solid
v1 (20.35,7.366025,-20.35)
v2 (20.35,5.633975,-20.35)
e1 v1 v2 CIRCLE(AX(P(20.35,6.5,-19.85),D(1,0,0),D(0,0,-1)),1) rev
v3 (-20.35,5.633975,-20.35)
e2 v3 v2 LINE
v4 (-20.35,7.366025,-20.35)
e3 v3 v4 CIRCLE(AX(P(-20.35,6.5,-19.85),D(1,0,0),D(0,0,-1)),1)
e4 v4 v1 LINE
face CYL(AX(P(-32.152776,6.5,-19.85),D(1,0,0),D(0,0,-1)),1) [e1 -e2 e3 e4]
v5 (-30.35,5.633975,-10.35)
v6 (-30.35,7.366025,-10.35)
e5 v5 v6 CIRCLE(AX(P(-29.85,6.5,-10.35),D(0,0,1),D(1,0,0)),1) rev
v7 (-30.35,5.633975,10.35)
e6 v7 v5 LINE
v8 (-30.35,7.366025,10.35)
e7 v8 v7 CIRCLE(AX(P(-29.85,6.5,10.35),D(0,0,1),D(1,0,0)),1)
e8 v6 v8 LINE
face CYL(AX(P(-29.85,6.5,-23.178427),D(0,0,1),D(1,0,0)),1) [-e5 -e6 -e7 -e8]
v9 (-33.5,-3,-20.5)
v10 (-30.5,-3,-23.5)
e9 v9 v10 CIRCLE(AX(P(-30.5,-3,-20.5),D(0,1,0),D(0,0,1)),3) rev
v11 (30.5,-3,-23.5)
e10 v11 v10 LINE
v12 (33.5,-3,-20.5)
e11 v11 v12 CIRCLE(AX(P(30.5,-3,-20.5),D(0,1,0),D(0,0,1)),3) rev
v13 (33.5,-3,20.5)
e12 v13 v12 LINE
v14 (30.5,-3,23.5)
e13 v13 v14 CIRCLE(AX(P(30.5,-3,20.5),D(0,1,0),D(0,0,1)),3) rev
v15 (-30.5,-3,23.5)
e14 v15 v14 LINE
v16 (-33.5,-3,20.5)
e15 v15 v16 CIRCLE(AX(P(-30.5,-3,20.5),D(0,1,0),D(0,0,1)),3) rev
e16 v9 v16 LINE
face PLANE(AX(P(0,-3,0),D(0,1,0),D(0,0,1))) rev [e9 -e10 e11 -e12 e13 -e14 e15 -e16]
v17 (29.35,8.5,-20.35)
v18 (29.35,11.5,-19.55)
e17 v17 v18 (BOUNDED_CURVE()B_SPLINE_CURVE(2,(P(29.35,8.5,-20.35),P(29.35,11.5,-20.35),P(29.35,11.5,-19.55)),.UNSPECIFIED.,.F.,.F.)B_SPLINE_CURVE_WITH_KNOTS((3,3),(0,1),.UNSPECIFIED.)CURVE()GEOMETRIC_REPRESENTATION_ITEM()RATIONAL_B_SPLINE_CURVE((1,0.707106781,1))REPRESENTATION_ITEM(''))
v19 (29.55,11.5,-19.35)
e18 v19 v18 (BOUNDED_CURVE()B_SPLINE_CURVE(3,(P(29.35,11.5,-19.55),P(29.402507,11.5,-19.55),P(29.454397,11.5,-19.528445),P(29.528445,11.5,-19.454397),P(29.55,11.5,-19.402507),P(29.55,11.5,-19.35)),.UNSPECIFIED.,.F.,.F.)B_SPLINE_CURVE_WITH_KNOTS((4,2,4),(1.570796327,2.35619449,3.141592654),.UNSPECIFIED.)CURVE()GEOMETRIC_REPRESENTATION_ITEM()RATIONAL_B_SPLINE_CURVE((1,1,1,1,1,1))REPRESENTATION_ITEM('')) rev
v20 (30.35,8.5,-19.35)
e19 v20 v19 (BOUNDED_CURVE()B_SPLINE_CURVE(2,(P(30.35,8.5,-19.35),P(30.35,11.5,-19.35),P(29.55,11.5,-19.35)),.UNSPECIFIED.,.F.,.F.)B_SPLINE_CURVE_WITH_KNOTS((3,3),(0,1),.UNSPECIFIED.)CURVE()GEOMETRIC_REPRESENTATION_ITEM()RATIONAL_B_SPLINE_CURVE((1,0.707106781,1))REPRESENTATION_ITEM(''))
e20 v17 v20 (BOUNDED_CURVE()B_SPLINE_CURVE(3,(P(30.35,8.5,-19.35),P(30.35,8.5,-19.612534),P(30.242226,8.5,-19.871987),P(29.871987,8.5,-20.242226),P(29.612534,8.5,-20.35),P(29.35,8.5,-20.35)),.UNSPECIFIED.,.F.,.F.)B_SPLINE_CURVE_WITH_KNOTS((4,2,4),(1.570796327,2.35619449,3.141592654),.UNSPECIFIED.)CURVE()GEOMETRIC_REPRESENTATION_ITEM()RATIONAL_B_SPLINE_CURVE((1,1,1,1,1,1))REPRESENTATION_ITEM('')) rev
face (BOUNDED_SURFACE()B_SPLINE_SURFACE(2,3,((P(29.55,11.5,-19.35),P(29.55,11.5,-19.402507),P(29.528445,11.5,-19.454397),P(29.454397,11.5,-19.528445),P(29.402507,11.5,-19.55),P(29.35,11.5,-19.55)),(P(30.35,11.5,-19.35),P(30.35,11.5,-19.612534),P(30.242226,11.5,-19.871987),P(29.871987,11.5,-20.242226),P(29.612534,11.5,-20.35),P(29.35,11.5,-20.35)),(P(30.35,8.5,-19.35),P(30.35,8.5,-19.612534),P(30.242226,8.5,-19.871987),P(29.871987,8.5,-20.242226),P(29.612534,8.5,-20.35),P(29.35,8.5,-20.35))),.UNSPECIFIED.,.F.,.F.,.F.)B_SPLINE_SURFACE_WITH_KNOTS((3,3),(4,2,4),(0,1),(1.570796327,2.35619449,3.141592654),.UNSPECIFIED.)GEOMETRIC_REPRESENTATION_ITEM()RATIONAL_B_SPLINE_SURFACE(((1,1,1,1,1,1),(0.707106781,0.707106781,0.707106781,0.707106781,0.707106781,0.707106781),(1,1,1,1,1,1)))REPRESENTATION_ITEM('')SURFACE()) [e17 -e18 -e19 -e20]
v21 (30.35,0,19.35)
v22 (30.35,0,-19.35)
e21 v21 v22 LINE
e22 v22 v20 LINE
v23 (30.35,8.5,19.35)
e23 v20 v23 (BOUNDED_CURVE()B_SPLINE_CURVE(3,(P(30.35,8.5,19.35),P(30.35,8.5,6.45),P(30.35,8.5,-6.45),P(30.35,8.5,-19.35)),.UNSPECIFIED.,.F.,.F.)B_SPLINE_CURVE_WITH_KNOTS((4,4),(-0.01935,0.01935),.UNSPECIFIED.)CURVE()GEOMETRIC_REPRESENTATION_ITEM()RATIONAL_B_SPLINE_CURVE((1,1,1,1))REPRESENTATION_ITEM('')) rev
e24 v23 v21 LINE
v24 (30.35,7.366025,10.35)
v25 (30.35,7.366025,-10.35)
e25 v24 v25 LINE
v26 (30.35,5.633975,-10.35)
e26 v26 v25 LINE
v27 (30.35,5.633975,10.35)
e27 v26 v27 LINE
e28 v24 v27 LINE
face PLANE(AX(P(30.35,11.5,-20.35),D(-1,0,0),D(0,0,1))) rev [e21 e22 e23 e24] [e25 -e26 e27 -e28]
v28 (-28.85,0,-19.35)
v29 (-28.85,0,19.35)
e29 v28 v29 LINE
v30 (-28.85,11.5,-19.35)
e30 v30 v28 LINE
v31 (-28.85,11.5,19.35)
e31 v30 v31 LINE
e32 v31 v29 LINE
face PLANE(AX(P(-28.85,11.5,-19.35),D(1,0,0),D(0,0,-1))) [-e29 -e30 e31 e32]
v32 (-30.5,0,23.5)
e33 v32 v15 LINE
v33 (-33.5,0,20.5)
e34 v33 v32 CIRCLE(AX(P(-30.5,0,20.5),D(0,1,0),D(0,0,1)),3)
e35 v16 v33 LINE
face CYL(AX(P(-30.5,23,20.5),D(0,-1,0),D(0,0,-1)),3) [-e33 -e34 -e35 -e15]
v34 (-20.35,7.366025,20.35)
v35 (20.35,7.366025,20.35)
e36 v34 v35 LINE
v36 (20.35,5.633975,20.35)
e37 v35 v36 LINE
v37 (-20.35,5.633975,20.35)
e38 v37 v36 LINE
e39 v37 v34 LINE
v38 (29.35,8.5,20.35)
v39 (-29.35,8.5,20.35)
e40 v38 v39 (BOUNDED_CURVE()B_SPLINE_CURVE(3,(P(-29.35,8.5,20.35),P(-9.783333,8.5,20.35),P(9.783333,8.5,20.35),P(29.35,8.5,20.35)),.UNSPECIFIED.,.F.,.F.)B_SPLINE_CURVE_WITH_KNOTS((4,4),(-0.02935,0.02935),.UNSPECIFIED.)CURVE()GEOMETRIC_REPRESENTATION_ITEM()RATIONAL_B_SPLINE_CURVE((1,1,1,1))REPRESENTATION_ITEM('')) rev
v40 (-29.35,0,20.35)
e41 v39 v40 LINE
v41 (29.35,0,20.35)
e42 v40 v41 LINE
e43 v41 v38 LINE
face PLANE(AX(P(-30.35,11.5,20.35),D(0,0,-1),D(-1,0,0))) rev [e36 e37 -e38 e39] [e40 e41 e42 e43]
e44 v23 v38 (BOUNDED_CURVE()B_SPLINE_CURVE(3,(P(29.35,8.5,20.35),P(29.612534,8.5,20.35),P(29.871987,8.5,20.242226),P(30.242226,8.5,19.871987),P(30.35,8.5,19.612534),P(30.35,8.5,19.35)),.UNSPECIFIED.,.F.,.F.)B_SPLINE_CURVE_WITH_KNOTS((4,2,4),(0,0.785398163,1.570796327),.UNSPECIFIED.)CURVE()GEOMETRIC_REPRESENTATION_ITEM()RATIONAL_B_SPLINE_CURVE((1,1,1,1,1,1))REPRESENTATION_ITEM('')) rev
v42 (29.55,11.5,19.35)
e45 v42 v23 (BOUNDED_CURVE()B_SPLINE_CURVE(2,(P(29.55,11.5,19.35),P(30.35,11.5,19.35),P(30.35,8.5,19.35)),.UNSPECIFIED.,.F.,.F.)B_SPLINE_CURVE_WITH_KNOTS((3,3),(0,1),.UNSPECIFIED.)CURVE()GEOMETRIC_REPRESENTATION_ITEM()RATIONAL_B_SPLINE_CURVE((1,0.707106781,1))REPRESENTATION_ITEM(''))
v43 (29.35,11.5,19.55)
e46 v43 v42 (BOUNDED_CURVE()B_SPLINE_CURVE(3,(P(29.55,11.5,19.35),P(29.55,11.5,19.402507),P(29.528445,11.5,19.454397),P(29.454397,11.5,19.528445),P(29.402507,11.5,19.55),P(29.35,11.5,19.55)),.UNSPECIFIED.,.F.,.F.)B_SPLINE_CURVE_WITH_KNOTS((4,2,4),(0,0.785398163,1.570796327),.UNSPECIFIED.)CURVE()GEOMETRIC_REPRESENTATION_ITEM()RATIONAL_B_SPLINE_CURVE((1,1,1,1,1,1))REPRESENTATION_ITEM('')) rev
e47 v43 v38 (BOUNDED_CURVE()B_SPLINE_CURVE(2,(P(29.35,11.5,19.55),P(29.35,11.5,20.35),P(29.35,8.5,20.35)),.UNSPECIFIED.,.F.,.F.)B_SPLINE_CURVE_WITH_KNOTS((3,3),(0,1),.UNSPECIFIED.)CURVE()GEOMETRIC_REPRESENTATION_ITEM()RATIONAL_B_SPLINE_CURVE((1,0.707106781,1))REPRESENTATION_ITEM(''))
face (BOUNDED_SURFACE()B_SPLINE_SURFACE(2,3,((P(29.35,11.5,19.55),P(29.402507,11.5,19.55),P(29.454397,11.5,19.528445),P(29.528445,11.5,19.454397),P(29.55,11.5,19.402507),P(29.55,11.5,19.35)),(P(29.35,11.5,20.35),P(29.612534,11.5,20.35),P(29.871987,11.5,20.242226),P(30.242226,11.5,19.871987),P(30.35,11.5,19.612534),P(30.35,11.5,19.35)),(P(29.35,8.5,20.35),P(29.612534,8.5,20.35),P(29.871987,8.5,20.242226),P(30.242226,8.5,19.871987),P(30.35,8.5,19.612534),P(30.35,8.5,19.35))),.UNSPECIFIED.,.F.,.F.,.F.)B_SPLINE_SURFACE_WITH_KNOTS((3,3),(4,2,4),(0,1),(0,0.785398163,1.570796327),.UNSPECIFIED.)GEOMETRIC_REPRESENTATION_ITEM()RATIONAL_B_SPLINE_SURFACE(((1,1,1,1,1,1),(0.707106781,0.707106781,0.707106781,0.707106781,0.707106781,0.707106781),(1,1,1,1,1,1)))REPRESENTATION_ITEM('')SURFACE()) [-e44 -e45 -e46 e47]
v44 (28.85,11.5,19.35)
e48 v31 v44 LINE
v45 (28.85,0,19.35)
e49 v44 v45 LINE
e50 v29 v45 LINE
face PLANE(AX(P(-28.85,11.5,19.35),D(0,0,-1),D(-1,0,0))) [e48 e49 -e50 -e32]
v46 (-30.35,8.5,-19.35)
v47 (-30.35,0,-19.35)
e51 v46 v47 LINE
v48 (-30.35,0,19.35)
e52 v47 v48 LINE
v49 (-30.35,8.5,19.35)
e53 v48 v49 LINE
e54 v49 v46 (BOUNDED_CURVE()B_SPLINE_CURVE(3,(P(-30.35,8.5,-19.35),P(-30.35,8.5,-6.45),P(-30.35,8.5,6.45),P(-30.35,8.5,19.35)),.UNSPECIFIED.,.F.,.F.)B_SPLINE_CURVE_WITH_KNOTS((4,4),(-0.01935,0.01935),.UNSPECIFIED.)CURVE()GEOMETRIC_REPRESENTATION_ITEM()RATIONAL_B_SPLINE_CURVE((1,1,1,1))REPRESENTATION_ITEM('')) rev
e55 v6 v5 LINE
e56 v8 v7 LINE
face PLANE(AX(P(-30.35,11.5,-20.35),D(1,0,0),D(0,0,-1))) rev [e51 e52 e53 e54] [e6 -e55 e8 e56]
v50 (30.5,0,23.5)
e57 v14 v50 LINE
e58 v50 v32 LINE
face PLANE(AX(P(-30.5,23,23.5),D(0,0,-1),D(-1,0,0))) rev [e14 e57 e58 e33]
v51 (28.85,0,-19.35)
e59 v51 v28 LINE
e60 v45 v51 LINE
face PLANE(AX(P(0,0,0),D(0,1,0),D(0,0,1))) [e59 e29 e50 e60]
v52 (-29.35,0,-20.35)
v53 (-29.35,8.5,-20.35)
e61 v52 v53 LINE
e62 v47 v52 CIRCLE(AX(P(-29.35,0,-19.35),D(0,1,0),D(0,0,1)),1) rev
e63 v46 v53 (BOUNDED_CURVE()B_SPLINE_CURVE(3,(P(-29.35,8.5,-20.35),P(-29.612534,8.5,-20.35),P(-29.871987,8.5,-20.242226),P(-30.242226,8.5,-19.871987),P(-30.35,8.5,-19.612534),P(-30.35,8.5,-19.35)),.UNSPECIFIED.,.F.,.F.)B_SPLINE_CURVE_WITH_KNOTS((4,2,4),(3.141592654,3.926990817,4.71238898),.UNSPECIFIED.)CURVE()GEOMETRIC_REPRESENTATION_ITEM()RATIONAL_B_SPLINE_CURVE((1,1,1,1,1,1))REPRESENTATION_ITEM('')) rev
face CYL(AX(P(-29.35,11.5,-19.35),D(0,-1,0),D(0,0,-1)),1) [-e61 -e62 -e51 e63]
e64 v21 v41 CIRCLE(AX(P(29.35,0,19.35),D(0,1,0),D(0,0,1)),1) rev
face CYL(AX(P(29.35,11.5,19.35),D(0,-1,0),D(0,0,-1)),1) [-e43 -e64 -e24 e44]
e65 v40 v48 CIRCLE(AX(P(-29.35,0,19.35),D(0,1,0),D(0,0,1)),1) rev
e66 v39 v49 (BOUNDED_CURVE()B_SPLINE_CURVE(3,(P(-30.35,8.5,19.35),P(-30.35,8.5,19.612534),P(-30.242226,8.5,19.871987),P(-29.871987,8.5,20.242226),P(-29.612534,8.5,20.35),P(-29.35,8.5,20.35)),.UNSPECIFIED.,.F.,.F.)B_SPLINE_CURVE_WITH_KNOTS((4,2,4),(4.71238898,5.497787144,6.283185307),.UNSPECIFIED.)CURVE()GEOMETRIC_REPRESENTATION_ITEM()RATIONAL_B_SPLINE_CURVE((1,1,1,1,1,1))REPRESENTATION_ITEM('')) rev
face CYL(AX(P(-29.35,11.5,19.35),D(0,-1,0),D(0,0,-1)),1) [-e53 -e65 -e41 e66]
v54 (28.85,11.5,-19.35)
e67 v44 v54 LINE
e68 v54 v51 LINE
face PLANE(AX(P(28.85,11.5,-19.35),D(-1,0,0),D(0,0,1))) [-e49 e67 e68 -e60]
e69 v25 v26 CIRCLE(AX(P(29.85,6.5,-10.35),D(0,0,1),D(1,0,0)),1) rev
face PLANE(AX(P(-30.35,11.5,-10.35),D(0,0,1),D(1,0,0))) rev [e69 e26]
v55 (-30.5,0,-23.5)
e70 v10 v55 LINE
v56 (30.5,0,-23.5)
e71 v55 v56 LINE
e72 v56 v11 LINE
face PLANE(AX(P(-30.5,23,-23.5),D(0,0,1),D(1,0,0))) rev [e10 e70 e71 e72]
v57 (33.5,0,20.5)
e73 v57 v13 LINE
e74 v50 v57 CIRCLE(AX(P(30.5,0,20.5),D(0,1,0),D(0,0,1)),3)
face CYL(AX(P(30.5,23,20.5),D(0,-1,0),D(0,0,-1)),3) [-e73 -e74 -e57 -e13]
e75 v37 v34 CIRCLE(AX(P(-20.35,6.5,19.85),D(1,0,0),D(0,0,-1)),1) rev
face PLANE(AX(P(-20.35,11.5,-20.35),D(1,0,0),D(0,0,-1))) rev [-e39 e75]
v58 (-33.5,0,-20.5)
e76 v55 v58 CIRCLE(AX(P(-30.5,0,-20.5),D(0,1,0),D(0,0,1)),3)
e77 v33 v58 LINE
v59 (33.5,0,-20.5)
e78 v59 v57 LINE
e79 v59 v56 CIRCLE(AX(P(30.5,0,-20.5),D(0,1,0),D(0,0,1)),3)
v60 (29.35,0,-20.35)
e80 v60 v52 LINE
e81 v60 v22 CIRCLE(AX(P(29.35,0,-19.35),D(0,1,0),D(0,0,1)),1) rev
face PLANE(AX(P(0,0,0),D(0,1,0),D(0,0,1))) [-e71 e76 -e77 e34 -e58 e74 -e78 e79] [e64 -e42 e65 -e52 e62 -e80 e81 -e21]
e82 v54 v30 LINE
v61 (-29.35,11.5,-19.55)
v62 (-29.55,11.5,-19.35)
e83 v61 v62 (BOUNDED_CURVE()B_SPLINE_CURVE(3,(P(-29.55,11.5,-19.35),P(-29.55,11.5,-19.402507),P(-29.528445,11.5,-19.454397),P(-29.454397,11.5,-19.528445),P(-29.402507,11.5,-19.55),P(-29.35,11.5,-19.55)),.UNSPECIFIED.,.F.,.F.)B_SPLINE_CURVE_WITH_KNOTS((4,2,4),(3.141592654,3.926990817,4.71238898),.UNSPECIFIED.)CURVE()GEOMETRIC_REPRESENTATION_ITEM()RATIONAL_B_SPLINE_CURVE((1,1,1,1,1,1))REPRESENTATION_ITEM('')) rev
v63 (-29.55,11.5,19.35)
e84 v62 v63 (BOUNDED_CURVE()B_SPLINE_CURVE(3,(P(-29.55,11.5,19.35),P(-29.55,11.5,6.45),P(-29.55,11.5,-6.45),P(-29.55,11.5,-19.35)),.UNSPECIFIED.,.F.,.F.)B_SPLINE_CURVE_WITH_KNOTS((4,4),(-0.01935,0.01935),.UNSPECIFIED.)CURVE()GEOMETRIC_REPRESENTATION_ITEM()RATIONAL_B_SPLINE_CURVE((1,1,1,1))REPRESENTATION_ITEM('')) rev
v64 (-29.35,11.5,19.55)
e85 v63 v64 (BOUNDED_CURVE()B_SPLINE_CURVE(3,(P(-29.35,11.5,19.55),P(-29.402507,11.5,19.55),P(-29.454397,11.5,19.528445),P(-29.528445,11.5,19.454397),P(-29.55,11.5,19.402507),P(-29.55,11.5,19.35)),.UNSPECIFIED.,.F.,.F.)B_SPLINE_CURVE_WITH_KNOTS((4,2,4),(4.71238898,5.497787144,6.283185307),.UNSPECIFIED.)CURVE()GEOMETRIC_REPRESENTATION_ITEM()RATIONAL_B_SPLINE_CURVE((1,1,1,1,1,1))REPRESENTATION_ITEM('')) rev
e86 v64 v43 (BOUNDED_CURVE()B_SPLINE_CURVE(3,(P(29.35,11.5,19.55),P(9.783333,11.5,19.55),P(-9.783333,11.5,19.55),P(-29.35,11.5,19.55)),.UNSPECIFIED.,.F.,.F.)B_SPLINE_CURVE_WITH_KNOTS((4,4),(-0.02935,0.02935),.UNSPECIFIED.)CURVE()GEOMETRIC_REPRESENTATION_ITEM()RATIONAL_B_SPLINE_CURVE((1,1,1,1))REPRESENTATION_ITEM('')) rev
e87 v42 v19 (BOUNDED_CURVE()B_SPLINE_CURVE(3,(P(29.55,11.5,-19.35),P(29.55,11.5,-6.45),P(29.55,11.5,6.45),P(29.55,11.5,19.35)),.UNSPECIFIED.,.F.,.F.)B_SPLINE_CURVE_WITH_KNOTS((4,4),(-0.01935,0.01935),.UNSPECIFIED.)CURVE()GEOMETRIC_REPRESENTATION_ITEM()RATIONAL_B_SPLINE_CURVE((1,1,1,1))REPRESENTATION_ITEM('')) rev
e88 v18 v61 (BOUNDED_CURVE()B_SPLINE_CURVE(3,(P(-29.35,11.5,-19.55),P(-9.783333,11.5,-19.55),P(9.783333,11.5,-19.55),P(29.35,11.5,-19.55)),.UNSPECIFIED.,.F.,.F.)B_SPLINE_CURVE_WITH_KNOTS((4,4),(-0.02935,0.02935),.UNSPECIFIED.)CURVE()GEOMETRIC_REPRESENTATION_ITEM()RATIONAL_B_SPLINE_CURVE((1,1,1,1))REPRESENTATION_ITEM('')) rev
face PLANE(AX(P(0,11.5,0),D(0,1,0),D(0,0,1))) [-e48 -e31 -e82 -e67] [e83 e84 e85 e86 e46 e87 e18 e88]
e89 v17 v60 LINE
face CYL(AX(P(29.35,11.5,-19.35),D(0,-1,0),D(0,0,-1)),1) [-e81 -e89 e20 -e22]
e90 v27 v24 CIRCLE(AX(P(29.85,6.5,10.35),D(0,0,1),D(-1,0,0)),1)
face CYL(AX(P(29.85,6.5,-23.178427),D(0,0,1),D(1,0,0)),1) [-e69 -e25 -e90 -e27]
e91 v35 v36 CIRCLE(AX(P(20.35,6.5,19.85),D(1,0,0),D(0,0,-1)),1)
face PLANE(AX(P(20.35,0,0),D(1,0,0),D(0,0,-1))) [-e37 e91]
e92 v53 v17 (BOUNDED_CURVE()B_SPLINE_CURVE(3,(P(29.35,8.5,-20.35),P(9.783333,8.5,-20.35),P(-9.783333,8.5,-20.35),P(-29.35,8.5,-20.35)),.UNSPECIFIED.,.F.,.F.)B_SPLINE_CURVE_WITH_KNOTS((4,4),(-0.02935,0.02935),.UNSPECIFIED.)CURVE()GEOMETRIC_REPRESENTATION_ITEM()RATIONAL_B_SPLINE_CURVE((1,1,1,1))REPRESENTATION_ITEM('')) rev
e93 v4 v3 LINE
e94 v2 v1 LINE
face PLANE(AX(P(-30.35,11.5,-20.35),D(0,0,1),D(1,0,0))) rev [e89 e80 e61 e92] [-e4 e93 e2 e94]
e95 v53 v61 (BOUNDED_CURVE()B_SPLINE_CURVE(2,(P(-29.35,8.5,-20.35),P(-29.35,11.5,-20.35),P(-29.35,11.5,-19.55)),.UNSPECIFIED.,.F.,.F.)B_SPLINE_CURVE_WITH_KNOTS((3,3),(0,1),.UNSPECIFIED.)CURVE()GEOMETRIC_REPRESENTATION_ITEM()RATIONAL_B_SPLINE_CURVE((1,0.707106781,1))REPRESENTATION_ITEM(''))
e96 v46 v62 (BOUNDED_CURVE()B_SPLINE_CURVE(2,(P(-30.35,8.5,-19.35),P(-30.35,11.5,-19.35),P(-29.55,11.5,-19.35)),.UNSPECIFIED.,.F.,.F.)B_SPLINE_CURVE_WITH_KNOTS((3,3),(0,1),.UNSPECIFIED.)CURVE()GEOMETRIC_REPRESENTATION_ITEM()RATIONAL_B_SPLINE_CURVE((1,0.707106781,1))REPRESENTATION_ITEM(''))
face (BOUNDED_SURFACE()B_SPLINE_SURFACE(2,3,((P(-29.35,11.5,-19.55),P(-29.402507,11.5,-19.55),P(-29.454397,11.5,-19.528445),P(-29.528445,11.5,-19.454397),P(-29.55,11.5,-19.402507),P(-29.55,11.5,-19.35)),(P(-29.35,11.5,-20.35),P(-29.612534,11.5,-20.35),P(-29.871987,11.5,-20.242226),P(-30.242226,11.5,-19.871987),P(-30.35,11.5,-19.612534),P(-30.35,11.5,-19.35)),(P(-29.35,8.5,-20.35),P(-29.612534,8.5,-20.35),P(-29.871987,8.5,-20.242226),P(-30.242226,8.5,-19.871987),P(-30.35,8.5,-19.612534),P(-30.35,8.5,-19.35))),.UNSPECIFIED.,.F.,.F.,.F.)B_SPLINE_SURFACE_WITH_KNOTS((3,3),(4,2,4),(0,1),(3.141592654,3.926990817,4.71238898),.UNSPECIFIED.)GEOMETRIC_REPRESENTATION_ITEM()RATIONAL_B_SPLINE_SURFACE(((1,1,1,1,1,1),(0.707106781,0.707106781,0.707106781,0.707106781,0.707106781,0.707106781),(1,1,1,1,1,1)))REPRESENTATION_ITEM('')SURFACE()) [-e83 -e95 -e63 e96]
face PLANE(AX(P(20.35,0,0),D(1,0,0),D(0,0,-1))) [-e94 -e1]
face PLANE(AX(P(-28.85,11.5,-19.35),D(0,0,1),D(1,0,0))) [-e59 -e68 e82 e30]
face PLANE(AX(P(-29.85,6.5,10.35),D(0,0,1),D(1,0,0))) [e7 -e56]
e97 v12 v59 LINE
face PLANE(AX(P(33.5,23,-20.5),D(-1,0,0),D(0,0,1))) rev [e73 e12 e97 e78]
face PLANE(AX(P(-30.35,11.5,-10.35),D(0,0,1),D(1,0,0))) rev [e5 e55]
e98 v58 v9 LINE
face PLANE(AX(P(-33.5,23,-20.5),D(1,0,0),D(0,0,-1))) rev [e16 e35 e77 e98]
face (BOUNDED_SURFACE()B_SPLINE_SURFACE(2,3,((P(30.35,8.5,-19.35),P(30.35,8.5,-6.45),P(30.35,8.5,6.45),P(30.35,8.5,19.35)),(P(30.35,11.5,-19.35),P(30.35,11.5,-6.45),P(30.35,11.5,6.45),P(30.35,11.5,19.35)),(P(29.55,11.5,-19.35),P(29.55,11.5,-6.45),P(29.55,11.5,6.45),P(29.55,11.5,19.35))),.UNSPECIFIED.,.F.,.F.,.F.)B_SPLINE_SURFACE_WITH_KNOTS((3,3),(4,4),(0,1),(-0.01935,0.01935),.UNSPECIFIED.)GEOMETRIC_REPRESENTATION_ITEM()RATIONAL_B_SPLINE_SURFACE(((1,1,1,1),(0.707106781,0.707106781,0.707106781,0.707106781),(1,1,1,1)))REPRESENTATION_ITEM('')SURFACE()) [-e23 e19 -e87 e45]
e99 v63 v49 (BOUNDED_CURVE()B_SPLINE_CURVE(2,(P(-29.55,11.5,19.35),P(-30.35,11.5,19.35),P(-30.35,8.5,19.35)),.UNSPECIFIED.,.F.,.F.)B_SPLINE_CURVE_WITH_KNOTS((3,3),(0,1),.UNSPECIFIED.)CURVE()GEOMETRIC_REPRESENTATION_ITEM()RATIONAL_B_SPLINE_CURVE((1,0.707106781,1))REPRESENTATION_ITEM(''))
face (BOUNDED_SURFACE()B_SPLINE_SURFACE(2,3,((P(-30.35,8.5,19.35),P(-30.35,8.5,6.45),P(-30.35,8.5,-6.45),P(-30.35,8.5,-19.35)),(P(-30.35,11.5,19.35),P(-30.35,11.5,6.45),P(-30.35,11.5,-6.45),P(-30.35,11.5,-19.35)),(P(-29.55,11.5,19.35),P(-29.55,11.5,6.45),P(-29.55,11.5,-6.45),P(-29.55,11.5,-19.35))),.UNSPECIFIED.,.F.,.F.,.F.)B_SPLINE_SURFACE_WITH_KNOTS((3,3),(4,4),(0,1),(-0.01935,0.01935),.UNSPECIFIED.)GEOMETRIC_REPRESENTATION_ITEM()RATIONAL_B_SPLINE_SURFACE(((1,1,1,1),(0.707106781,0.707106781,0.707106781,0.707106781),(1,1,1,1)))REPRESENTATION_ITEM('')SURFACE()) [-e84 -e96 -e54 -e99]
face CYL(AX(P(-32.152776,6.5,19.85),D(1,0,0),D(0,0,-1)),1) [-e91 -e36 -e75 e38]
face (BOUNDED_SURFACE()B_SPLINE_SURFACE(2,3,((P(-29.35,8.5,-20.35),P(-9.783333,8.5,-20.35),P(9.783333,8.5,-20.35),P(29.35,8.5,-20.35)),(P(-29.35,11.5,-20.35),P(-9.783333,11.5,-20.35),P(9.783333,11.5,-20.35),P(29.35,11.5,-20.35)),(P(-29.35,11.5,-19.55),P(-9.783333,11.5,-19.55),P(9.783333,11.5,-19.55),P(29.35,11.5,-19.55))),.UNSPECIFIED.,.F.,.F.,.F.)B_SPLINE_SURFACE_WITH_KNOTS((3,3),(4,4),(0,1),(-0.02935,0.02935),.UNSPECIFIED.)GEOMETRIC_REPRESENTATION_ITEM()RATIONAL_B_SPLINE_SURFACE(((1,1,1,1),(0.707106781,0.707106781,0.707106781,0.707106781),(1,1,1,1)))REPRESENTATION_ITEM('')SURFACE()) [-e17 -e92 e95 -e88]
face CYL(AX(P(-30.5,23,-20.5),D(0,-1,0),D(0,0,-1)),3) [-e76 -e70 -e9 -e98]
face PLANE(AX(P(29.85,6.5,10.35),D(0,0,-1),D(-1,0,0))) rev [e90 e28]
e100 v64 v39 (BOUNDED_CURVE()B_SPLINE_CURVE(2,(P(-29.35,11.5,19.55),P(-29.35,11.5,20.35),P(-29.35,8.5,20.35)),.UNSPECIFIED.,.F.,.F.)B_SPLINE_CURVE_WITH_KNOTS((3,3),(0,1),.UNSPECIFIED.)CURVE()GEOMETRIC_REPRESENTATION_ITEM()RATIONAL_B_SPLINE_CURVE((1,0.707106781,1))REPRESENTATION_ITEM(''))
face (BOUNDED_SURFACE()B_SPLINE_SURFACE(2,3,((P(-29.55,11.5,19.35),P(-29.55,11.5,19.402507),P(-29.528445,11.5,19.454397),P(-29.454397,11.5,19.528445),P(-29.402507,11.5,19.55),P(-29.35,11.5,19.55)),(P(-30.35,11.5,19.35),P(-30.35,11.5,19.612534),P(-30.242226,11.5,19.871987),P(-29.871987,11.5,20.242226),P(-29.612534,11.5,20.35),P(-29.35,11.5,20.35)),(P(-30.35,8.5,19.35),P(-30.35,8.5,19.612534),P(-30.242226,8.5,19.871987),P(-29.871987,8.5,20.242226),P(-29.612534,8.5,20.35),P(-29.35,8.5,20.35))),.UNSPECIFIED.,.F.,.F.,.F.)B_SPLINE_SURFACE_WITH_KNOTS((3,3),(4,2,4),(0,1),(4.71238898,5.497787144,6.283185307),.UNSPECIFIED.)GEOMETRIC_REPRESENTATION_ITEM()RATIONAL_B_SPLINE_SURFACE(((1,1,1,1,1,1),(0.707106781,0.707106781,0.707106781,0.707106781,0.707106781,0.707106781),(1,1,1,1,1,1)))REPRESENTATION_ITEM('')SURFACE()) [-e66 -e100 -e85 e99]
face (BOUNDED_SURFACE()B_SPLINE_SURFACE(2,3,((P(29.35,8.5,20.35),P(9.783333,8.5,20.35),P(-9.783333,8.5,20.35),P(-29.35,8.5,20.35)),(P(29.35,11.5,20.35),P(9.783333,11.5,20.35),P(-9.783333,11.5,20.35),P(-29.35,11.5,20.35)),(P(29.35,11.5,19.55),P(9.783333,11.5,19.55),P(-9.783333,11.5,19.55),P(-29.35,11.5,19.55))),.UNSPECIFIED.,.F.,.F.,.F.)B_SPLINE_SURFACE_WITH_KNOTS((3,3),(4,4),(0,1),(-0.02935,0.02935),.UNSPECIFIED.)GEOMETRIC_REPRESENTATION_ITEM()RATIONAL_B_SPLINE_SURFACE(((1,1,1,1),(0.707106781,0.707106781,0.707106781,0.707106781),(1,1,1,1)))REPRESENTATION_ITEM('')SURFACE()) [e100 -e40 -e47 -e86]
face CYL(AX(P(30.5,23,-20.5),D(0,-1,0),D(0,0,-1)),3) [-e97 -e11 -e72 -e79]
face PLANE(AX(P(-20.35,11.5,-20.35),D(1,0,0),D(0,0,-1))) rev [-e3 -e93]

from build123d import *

# Parameters (mm, degrees)
SKETCH1_W           = 61
SKETCH1_H           = 41
BOSS_EXTRUDE1_DEPTH = 23
SHELL1_T            = 3
SKETCH2_W           = 67
SKETCH2_H           = 47
CUT_EXTRUDE1_DEPTH  = 23
SKETCH3_W           = 60.7
SKETCH3_H           = 40.7
SKETCH3_W_2         = 57.7
SKETCH3_H_2         = 38.7
BOSS_EXTRUDE2_DEPTH = 11.5
BOSS_EXTRUDE3_START = -10
SKETCH4_R           = 1
BOSS_EXTRUDE3_DEPTH = 20.7
BOSS_EXTRUDE4_START = -10
BOSS_EXTRUDE4_DEPTH = 40.7
FILLET1_R           = 3
FILLET2_R           = 1
FILLET3_SIZE        = 3
FILLET3_SIZE_2      = 0.8


with BuildPart() as part:
    # Sketch1 → Boss-Extrude1 (new body)
    with BuildSketch(Plane(origin=(0, 0, 0), x_dir=(1, 0, 0), z_dir=(0, 1, 0))):
        Rectangle(SKETCH1_W, SKETCH1_H)
    extrude(amount=BOSS_EXTRUDE1_DEPTH)

    # Shell1
    shell1_openings = [part.faces().sort_by_distance(p)[0] for p in [
        (0, 23, 0),
    ]]
    offset(amount=SHELL1_T, openings=shell1_openings, kind=Kind.INTERSECTION)

    # Sketch2 → Cut-Extrude1 (cut)
    with BuildSketch(Plane(origin=(0, 23, 0), x_dir=(1, 0, 0), z_dir=(0, 1, 0))):
        Rectangle(SKETCH2_W, SKETCH2_H)
    extrude(amount=-CUT_EXTRUDE1_DEPTH, mode=Mode.SUBTRACT)

    # Sketch3 → Boss-Extrude2 (add)
    with BuildSketch(Plane(origin=(0, 0, 0), x_dir=(1, 0, 0), z_dir=(0, 1, 0))):
        Rectangle(SKETCH3_W, SKETCH3_H)
        Rectangle(SKETCH3_W_2, SKETCH3_H_2, mode=Mode.SUBTRACT)
    extrude(amount=BOSS_EXTRUDE2_DEPTH)

    # Sketch4 → Boss-Extrude3 (add)
    with BuildSketch(Plane.XY.offset(20.35).offset(BOSS_EXTRUDE3_START)):
        with Locations((-29.85, 6.5)):
            Circle(SKETCH4_R)
        with Locations((29.85, 6.5)):
            Circle(SKETCH4_R)
    extrude(amount=-BOSS_EXTRUDE3_DEPTH)

    # Sketch5 → Boss-Extrude4 (add)
    with BuildSketch(Plane(origin=(30.35, 0, 0), x_dir=(0, 0, -1), z_dir=(1, 0, 0)).offset(BOSS_EXTRUDE4_START)):
        with BuildLine():
            Line((-20.35, 5.633974596), (-20.35, 7.366025404))
            ThreePointArc((-20.35, 7.366025404), (-20.85, 6.5), (-20.35, 5.633974596))
        make_face()
        with BuildLine():
            ThreePointArc((20.35, 5.633974596), (20.716025404, 6), (20.85, 6.5))
            ThreePointArc((20.85, 6.5), (20.716025404, 7), (20.35, 7.366025404))
            Line((20.35, 7.366025404), (20.35, 5.633974596))
        make_face()
    extrude(amount=-BOSS_EXTRUDE4_DEPTH)

    # Fillet1
    fillet1_edges = [part.edges().sort_by_distance(p)[0] for p in [
        (33.5, -1.5, 23.5),
        (-33.5, -1.5, 23.5),
        (-33.5, -1.5, -23.5),
        (33.5, -1.5, -23.5),
    ]]
    fillet(fillet1_edges, radius=FILLET1_R)

    # Fillet2
    fillet2_edges = [part.edges().sort_by_distance(p)[0] for p in [
        (30.35, 5.75, 20.35),
        (30.35, 5.75, -20.35),
        (-30.35, 5.75, -20.35),
        (-30.35, 5.75, 20.35),
    ]]
    fillet(fillet2_edges, radius=FILLET2_R)

    # Fillet3
    # an asymmetric fillet: 3, 0.8 mm, written as the material it takes off along each edge
    with BuildSketch(Plane(origin=(30.35, 11.5, -19.35), x_dir=(0, -1, 0), z_dir=(0, 0, 1)), Plane(origin=(-30.35, 11.5, 19.35), x_dir=(0, -1, 0), z_dir=(0, 0, -1))) as fillet3_piece_1:
        with BuildLine():
            Bezier((FILLET3_SIZE, 0), (0, 0), (0, -FILLET3_SIZE_2), weights=[1, 0.707106781, 1])
            Line((0, -FILLET3_SIZE_2), (0, 0))
            Line((0, 0), (FILLET3_SIZE, 0))
        make_face()
    extrude(amount=38.7, mode=Mode.SUBTRACT)
    with BuildSketch(Plane(origin=(29.35, 11.5, -19.35), x_dir=(0, 0, -1), z_dir=(-1, 0, 0))) as fillet3_piece_2:
        with BuildLine():
            Bezier((1, FILLET3_SIZE), (1, 0), (1 - FILLET3_SIZE_2, 0), weights=[1, 0.707106781, 1])
            Line((1 - FILLET3_SIZE_2, 0), (1, 0))
            Line((1, 0), (1, FILLET3_SIZE))
        make_face()
    revolve(axis=Axis((29.35, 11.5, -19.35), (0, -1, 0)), revolution_arc=90, mode=Mode.SUBTRACT)
    with BuildSketch(Plane(origin=(29.35, 11.5, 19.35), x_dir=(1, 0, 0), z_dir=(0, 0, -1))) as fillet3_piece_3:
        with BuildLine():
            Bezier((1, FILLET3_SIZE), (1, 0), (1 - FILLET3_SIZE_2, 0), weights=[1, 0.707106781, 1])
            Line((1 - FILLET3_SIZE_2, 0), (1, 0))
            Line((1, 0), (1, FILLET3_SIZE))
        make_face()
    revolve(axis=Axis((29.35, 11.5, 19.35), (0, -1, 0)), revolution_arc=90, mode=Mode.SUBTRACT)
    with BuildSketch(Plane(origin=(-29.35, 11.5, -20.35), x_dir=(0, -1, 0), z_dir=(1, 0, 0)), Plane(origin=(29.35, 11.5, 20.35), x_dir=(0, -1, 0), z_dir=(-1, 0, 0))) as fillet3_piece_4:
        with BuildLine():
            Bezier((FILLET3_SIZE, 0), (0, 0), (0, -FILLET3_SIZE_2), weights=[1, 0.707106781, 1])
            Line((0, -FILLET3_SIZE_2), (0, 0))
            Line((0, 0), (FILLET3_SIZE, 0))
        make_face()
    extrude(amount=58.7, mode=Mode.SUBTRACT)
    with BuildSketch(Plane(origin=(-29.35, 11.5, -19.35), x_dir=(0, 0, -1), z_dir=(1, 0, 0))) as fillet3_piece_5:
        with BuildLine():
            Bezier((1, -FILLET3_SIZE), (1, 0), (1 - FILLET3_SIZE_2, 0), weights=[1, 0.707106781, 1])
            Line((1 - FILLET3_SIZE_2, 0), (1, 0))
            Line((1, 0), (1, -FILLET3_SIZE))
        make_face()
    revolve(axis=Axis((-29.35, 11.5, -19.35), (0, 1, 0)), revolution_arc=90, mode=Mode.SUBTRACT)
    with BuildSketch(Plane(origin=(-29.35, 11.5, 19.35), x_dir=(0, 0, 1), z_dir=(1, 0, 0))) as fillet3_piece_6:
        with BuildLine():
            Bezier((1, FILLET3_SIZE), (1, 0), (1 - FILLET3_SIZE_2, 0), weights=[1, 0.707106781, 1])
            Line((1 - FILLET3_SIZE_2, 0), (1, 0))
            Line((1, 0), (1, FILLET3_SIZE))
        make_face()
    revolve(axis=Axis((-29.35, 11.5, 19.35), (0, -1, 0)), revolution_arc=90, mode=Mode.SUBTRACT)


solid = part.part
